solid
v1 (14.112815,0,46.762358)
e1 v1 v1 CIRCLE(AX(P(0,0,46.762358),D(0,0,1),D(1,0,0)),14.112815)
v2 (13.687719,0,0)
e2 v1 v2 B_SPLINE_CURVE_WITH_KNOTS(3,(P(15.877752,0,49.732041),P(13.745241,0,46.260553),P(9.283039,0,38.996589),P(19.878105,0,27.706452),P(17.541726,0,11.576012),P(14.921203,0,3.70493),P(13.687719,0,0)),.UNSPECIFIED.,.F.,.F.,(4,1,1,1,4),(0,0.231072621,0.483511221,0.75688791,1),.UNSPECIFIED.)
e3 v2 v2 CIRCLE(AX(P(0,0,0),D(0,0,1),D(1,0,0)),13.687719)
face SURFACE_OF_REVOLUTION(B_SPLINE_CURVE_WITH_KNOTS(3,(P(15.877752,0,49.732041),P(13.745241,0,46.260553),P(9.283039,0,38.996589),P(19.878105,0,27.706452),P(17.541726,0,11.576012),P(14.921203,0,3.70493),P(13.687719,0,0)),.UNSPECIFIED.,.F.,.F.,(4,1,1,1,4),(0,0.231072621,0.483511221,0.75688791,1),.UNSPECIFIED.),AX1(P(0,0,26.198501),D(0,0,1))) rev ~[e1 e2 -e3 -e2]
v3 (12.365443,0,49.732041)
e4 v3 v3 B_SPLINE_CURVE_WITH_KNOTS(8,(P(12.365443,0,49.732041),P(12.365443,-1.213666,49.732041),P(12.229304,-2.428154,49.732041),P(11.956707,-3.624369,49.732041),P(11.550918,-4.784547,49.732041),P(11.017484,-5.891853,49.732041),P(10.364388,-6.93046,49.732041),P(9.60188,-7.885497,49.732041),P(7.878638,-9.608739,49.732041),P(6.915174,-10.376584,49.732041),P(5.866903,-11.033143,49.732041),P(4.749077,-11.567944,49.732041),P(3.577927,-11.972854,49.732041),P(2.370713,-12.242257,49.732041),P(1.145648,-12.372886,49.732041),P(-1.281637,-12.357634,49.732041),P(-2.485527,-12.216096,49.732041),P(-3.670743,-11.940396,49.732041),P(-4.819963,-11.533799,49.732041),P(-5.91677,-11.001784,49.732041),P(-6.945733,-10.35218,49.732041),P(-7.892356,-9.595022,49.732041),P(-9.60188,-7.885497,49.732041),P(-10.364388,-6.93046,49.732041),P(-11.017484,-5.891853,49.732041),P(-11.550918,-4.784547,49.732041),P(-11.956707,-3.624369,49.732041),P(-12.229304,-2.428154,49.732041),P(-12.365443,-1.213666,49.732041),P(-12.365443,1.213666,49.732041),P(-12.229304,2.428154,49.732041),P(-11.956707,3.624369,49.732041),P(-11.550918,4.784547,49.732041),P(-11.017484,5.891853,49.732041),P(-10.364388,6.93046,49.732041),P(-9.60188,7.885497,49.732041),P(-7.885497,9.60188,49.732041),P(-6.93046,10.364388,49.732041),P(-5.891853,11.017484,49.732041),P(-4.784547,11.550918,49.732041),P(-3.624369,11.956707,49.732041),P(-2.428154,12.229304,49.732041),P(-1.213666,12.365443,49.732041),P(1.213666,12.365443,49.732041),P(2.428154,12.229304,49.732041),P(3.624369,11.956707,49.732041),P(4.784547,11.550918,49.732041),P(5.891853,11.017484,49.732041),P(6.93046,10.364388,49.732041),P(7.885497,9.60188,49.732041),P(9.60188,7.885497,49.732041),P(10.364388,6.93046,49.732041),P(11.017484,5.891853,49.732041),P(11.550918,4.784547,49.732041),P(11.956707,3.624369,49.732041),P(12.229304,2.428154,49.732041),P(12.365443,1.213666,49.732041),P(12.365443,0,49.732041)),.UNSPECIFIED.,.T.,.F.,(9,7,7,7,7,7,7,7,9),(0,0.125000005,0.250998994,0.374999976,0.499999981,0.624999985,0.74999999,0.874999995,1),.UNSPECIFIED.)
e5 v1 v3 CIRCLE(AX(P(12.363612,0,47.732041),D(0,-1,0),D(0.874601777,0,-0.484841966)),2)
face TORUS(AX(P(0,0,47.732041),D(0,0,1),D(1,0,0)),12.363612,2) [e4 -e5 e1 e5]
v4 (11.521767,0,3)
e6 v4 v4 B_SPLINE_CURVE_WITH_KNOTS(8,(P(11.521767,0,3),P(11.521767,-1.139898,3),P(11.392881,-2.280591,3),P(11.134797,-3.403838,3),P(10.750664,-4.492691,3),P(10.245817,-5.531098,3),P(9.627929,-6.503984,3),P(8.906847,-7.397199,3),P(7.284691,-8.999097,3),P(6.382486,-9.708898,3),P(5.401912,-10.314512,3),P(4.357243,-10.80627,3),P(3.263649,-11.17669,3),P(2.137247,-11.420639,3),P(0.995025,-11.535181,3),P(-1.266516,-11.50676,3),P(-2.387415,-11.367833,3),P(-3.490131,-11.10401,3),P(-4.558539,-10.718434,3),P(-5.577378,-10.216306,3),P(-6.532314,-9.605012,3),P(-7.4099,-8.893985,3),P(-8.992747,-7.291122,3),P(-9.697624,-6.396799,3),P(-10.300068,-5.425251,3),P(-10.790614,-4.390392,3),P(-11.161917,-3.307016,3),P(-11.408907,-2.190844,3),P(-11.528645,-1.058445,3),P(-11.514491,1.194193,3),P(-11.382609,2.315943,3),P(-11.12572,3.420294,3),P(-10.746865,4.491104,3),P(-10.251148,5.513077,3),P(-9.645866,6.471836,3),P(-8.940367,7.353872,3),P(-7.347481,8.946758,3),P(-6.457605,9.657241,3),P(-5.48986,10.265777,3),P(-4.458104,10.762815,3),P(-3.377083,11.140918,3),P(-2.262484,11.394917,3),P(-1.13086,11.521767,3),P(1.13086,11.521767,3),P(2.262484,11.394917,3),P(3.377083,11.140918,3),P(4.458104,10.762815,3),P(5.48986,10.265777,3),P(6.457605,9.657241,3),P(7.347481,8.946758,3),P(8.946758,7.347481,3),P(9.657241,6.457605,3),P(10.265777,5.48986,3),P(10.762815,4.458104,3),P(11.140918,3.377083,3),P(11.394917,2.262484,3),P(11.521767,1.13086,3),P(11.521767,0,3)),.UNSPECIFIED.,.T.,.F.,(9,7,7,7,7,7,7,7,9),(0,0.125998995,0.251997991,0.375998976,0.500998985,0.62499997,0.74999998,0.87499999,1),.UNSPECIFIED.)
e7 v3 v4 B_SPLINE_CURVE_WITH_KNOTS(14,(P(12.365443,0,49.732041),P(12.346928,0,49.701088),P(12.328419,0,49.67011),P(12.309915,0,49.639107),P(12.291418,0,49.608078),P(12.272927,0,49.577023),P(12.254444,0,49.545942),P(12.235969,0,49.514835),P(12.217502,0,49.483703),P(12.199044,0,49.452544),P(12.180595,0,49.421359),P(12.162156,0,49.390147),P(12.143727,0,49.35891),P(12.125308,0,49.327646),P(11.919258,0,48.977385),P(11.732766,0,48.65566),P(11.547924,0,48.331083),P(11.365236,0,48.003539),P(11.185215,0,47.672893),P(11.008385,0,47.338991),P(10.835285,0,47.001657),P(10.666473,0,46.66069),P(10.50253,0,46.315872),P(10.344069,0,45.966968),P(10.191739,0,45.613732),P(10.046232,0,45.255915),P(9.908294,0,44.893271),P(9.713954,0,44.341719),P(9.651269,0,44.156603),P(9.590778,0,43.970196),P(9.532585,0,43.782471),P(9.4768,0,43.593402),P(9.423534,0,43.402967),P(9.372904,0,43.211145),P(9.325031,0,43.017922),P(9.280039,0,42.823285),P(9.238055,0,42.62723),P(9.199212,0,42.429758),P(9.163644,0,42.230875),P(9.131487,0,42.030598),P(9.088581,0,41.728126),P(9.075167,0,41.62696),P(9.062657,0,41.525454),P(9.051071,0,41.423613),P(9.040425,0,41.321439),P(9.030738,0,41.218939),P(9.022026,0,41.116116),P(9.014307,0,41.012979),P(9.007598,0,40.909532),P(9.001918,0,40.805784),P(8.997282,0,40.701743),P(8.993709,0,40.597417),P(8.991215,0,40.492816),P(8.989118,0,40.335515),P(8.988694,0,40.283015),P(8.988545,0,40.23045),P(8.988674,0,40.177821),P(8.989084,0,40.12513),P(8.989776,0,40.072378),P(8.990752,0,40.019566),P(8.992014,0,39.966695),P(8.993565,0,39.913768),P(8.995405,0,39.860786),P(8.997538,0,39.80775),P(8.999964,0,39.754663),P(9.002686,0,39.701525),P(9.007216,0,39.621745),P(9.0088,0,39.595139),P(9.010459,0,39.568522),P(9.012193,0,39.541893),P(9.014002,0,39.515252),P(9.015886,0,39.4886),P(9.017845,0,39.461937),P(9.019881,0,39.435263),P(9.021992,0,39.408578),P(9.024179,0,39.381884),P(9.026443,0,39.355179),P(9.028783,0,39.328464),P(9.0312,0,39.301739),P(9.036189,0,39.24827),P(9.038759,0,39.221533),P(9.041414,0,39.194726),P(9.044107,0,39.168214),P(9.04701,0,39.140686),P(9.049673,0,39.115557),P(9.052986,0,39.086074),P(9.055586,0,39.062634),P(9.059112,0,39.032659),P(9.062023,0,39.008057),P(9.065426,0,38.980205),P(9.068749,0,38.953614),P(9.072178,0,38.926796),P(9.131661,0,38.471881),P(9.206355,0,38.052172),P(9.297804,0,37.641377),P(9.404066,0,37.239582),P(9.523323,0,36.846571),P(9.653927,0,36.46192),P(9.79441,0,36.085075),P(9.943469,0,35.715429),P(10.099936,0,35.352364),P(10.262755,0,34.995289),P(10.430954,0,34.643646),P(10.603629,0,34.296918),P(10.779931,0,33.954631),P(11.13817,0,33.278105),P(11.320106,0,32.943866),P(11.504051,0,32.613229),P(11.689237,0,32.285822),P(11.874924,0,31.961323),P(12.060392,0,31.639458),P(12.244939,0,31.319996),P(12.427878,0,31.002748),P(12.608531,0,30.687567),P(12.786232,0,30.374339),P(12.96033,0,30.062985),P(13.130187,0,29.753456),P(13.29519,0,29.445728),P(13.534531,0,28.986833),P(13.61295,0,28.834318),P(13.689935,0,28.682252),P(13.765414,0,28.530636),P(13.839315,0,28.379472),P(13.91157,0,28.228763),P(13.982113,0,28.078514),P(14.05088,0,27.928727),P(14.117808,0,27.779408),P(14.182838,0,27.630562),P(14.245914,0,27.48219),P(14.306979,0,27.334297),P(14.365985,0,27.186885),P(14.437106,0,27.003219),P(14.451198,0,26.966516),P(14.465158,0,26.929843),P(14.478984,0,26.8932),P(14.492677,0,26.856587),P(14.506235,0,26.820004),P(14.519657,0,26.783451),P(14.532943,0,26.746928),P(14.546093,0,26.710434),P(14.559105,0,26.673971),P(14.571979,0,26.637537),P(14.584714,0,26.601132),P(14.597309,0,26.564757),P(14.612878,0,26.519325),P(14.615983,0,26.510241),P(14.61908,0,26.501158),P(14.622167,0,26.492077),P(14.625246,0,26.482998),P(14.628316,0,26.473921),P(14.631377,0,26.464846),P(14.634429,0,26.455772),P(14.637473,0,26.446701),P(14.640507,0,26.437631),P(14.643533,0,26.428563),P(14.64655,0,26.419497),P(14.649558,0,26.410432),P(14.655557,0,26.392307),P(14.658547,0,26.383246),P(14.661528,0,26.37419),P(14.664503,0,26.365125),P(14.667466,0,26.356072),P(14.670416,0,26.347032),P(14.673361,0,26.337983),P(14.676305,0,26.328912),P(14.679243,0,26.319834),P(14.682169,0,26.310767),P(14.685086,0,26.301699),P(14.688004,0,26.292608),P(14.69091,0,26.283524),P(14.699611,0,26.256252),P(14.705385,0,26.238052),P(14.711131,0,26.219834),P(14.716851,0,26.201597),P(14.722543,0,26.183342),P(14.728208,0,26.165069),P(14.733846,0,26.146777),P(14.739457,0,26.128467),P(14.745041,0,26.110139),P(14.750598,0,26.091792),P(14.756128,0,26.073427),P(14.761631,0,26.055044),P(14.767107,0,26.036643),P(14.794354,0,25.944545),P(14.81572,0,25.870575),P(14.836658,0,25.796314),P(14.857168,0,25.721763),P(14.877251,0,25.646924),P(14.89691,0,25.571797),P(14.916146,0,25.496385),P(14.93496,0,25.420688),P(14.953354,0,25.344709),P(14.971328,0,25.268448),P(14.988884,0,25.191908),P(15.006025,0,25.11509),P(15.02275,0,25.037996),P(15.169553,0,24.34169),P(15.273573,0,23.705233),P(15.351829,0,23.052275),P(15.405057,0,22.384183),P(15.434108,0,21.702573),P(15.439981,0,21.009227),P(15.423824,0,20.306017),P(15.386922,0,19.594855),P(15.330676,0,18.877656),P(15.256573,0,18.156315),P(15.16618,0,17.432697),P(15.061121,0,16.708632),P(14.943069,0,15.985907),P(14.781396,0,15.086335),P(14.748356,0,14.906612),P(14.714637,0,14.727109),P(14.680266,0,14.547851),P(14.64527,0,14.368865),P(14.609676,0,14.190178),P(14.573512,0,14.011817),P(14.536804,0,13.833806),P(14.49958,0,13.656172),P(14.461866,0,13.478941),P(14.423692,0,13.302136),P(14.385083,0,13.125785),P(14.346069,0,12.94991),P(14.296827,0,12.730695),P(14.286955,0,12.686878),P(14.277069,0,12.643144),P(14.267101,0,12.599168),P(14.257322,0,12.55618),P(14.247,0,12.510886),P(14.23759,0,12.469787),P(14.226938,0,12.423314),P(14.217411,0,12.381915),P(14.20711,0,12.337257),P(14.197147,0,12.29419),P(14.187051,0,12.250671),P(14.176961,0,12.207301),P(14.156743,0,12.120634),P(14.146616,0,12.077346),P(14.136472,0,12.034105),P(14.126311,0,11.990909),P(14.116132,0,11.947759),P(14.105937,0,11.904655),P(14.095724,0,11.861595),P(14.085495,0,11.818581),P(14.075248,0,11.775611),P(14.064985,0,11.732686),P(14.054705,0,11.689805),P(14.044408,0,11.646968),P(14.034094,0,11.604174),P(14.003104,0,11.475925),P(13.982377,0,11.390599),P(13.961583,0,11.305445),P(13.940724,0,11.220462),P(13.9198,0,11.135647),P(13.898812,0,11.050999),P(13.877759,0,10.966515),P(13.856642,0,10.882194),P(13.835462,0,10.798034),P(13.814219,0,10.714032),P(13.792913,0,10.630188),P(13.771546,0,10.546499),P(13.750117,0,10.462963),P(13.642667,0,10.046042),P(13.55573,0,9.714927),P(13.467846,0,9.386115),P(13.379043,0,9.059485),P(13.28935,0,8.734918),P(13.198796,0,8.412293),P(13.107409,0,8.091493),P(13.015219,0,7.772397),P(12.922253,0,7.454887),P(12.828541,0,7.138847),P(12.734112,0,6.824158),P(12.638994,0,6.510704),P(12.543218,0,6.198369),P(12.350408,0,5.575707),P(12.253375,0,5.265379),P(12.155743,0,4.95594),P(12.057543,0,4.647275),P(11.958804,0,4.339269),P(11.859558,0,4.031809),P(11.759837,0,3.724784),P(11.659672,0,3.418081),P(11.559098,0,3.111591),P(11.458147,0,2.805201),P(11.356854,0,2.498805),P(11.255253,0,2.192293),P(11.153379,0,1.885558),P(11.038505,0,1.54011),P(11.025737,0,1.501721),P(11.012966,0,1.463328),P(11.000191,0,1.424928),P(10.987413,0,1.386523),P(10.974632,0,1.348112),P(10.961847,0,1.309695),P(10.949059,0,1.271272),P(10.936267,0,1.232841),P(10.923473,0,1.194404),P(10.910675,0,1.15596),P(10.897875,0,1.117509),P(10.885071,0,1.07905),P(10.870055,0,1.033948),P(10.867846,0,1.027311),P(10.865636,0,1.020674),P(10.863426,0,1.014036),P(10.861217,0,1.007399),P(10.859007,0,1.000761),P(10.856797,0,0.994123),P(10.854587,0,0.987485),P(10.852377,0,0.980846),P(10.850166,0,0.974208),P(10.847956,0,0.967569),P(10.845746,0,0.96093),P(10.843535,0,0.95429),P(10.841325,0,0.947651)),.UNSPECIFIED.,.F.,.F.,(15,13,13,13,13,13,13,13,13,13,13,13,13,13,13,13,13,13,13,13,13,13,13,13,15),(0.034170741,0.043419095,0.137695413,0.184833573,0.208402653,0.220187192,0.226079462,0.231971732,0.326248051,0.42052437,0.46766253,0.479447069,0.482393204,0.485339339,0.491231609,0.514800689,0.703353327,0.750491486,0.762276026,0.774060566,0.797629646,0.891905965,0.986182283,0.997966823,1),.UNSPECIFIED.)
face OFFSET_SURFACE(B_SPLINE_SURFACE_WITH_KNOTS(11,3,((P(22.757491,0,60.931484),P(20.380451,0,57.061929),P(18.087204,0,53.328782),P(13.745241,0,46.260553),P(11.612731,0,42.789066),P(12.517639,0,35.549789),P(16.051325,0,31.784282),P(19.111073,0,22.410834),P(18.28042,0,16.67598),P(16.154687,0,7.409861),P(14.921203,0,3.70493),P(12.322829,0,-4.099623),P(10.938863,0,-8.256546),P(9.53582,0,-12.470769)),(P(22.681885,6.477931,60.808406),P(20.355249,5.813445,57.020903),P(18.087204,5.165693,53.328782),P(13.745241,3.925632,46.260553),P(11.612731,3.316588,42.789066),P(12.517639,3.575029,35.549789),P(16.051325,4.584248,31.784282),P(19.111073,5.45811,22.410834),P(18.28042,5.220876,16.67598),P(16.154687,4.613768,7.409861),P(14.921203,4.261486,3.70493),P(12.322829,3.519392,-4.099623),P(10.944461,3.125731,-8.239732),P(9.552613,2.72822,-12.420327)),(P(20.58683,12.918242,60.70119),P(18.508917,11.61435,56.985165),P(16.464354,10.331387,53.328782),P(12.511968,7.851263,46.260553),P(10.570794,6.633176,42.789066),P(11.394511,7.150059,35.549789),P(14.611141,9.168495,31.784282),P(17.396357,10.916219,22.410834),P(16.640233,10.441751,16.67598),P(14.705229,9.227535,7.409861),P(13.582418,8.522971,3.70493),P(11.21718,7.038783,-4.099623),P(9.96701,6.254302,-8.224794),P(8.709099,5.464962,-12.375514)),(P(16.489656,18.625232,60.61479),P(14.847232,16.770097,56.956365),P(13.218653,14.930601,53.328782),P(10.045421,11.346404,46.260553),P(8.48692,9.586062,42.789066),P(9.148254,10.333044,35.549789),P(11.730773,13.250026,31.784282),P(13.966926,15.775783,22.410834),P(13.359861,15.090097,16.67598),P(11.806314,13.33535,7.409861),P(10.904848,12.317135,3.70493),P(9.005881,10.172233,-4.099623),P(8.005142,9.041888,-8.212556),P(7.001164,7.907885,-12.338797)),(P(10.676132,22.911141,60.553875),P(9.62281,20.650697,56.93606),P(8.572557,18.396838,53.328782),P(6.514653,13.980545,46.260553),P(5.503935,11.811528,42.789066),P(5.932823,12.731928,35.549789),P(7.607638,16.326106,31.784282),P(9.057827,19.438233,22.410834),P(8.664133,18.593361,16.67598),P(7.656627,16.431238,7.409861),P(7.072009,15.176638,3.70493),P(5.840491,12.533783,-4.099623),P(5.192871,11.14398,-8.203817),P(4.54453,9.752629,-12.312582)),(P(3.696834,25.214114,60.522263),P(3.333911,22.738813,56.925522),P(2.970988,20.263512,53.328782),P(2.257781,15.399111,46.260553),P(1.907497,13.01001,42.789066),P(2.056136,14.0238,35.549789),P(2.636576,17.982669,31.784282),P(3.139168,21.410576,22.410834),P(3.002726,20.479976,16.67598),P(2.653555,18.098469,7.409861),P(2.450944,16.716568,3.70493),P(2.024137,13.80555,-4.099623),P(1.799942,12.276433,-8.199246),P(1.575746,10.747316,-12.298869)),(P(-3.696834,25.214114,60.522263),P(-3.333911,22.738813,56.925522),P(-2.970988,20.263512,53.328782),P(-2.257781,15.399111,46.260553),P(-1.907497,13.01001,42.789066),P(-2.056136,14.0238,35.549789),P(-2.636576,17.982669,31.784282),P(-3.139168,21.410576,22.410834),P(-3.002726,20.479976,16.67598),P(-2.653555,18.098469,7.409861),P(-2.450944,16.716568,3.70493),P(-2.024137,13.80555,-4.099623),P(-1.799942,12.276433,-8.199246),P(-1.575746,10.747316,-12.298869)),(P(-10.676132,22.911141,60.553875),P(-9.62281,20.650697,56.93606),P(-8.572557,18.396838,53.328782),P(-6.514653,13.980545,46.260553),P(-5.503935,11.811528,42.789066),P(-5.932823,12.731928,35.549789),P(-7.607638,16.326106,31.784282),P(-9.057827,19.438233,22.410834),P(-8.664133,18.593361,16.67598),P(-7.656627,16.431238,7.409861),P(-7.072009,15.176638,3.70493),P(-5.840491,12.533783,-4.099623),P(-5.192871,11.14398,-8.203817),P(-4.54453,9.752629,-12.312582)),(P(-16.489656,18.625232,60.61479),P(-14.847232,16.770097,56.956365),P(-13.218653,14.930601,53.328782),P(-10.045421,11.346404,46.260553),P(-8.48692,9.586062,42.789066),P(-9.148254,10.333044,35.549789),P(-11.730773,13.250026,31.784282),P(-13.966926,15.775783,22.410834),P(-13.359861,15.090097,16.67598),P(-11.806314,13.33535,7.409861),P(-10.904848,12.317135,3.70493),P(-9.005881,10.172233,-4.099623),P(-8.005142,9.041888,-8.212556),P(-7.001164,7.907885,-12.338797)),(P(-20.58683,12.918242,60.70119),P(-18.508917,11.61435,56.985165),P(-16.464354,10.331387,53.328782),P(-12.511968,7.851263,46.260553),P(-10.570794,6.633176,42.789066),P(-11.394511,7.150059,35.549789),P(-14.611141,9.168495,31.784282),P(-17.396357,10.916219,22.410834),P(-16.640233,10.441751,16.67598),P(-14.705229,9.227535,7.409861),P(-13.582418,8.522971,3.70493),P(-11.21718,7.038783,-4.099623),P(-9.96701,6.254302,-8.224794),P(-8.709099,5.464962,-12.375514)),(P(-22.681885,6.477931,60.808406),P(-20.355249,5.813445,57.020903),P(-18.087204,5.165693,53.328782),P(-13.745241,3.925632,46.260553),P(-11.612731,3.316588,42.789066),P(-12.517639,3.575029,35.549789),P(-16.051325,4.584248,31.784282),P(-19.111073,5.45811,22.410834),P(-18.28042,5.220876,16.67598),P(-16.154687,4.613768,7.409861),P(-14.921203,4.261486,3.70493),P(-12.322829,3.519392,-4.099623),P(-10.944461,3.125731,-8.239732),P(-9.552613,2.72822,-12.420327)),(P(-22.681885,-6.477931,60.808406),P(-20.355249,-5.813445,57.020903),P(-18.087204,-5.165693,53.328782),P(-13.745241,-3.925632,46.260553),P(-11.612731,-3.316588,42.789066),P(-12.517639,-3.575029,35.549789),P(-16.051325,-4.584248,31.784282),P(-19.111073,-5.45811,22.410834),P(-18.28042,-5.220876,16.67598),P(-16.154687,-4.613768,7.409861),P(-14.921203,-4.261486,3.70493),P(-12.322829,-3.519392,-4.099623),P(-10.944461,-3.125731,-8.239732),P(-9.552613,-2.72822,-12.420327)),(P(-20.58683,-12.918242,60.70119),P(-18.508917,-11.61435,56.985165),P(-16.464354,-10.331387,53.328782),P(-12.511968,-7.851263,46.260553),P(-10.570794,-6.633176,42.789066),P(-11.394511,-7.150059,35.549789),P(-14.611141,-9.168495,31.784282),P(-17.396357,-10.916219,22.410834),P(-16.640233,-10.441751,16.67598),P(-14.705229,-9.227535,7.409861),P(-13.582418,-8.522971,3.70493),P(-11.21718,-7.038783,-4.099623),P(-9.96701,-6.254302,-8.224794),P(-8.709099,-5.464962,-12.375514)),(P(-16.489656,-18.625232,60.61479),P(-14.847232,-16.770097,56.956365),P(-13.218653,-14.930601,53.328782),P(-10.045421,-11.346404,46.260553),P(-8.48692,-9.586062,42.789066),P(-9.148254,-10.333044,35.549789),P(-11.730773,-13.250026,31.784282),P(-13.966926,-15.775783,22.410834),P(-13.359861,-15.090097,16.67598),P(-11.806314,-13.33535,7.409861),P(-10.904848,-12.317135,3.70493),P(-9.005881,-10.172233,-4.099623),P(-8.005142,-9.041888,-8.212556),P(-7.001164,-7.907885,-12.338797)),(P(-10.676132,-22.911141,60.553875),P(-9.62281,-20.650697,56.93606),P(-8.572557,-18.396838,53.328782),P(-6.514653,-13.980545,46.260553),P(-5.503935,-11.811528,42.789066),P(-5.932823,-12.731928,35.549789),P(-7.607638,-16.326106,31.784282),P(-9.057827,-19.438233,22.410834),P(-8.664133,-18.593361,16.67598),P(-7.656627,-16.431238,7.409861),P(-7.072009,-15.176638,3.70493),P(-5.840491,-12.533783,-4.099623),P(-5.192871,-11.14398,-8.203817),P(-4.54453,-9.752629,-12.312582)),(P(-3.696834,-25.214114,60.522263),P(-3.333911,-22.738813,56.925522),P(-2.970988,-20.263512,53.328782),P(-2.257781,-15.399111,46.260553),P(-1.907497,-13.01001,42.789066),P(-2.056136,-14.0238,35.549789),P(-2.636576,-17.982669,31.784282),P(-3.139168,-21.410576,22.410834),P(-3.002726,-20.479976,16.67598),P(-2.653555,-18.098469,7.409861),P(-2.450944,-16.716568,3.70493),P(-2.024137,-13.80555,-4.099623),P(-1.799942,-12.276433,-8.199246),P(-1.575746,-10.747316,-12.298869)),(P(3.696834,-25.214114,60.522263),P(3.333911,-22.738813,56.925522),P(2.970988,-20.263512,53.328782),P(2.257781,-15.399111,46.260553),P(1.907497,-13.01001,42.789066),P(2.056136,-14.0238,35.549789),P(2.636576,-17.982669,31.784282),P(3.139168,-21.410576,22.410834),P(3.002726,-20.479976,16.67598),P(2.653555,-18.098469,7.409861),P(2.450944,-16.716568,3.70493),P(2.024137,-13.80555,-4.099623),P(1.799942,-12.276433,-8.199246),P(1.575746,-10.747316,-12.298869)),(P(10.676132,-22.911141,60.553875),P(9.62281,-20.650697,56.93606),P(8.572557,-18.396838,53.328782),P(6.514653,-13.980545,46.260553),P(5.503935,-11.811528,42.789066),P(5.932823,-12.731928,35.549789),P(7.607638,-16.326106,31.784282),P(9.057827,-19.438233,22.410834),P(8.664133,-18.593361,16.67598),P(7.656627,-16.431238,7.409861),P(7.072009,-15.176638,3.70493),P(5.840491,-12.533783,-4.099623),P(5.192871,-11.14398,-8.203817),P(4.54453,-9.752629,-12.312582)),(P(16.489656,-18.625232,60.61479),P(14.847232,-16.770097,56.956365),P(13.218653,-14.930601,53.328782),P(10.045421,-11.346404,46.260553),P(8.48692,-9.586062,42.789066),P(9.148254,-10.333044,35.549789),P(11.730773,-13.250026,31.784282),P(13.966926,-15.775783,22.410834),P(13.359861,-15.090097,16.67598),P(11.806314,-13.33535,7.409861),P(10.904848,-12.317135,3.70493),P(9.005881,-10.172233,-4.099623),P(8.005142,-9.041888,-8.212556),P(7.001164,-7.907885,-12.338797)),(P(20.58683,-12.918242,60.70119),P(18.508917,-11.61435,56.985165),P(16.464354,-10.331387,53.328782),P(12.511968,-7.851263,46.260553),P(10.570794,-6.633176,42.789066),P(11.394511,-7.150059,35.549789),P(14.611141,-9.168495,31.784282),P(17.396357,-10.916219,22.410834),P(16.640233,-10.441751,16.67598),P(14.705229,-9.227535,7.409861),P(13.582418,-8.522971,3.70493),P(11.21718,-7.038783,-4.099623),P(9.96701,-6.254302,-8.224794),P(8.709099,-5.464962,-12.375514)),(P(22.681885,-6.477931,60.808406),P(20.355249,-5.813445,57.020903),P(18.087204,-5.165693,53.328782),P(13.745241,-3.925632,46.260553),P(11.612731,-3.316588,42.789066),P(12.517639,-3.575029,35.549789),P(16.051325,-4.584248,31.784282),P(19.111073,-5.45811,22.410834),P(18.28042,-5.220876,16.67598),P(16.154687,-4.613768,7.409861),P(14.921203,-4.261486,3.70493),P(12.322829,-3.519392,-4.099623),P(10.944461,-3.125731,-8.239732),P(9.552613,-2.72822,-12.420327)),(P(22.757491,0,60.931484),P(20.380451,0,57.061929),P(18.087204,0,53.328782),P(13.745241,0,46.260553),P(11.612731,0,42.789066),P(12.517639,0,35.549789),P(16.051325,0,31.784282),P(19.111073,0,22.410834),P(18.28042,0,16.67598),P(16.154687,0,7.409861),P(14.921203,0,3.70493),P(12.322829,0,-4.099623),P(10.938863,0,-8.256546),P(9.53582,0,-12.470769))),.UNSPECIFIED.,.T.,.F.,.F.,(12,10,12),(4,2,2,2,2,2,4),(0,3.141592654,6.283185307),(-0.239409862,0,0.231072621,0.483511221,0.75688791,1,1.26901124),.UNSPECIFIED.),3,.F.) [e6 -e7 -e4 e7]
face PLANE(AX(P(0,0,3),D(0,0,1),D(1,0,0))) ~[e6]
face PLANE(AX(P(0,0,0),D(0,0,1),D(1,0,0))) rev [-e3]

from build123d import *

# Parameters (mm, degrees)
F2_T = -3


# Not quite as in the source:
# - a fillet or chamfer that OpenCascade refuses, or shapes differently, is made with other operations: its cross-section is extruded or revolved along the edge and cut away or added


with BuildPart() as f1:
    # F0 (on Front) → F1 (revolve)
    with BuildSketch(Plane.XZ):
        with BuildLine():
            add(Edge.make_bspline(
                [(15.8777516335, 49.7320406139), (13.74524129, 46.2605530647), (9.2830394347, 38.9965891498), (19.8781052941, 27.7064520444), (17.5417256826, 11.5760115727), (14.9212029016, 3.7049304204), (13.6877186596, 0)],
                knots=[0, 0, 0, 0, 0.2310726214, 0.483511221, 0.7568879101, 1, 1, 1, 1], degree=3))
            Line((15.8777516335, 49.7320406139), (0, 49.7320406139))
            Line((0, 49.7320406139), (0, 0))
            Line((0, 0), (13.6877186596, 0))
        make_face()
    revolve(axis=Axis((0, 0, 26.1985007674), (0, 0, 1)))

    # F2
    f2_openings = [f1.faces().sort_by_distance(p)[0] for p in [
        (0, 0, 49.732041),
    ]]
    offset(amount=F2_T, openings=f2_openings)

    # F3: fillet of radius 2 on 1 edges, made by hand

    # F3_s1 → F3_t2 (revolve, cut)
    with BuildSketch(Plane.XZ):
        with BuildLine():
            ThreePointArc((14.1128151685, 46.7623575212), (14.0873533023, 48.7462971371), (12.3654431699, 49.7320406139))
            Line((12.3654431699, 49.7320406139), (12.365479801, 49.7720405971))
            Line((12.365479801, 49.7720405971), (15.8777516335, 49.7720406139))
            Line((15.8777516335, 49.7720406139), (15.9118345629, 49.7111037105))
            ThreePointArc((15.9118345629, 49.7111037105), (15.013225293, 48.236442696), (14.1477992396, 46.7429638426))
            Line((14.1477992396, 46.7429638426), (14.1128151685, 46.7623575212))
        make_face()
    revolve(axis=Axis((0, 0, 49.7320406139), (0, 0, 1)), mode=Mode.SUBTRACT)


solid = f1.part
